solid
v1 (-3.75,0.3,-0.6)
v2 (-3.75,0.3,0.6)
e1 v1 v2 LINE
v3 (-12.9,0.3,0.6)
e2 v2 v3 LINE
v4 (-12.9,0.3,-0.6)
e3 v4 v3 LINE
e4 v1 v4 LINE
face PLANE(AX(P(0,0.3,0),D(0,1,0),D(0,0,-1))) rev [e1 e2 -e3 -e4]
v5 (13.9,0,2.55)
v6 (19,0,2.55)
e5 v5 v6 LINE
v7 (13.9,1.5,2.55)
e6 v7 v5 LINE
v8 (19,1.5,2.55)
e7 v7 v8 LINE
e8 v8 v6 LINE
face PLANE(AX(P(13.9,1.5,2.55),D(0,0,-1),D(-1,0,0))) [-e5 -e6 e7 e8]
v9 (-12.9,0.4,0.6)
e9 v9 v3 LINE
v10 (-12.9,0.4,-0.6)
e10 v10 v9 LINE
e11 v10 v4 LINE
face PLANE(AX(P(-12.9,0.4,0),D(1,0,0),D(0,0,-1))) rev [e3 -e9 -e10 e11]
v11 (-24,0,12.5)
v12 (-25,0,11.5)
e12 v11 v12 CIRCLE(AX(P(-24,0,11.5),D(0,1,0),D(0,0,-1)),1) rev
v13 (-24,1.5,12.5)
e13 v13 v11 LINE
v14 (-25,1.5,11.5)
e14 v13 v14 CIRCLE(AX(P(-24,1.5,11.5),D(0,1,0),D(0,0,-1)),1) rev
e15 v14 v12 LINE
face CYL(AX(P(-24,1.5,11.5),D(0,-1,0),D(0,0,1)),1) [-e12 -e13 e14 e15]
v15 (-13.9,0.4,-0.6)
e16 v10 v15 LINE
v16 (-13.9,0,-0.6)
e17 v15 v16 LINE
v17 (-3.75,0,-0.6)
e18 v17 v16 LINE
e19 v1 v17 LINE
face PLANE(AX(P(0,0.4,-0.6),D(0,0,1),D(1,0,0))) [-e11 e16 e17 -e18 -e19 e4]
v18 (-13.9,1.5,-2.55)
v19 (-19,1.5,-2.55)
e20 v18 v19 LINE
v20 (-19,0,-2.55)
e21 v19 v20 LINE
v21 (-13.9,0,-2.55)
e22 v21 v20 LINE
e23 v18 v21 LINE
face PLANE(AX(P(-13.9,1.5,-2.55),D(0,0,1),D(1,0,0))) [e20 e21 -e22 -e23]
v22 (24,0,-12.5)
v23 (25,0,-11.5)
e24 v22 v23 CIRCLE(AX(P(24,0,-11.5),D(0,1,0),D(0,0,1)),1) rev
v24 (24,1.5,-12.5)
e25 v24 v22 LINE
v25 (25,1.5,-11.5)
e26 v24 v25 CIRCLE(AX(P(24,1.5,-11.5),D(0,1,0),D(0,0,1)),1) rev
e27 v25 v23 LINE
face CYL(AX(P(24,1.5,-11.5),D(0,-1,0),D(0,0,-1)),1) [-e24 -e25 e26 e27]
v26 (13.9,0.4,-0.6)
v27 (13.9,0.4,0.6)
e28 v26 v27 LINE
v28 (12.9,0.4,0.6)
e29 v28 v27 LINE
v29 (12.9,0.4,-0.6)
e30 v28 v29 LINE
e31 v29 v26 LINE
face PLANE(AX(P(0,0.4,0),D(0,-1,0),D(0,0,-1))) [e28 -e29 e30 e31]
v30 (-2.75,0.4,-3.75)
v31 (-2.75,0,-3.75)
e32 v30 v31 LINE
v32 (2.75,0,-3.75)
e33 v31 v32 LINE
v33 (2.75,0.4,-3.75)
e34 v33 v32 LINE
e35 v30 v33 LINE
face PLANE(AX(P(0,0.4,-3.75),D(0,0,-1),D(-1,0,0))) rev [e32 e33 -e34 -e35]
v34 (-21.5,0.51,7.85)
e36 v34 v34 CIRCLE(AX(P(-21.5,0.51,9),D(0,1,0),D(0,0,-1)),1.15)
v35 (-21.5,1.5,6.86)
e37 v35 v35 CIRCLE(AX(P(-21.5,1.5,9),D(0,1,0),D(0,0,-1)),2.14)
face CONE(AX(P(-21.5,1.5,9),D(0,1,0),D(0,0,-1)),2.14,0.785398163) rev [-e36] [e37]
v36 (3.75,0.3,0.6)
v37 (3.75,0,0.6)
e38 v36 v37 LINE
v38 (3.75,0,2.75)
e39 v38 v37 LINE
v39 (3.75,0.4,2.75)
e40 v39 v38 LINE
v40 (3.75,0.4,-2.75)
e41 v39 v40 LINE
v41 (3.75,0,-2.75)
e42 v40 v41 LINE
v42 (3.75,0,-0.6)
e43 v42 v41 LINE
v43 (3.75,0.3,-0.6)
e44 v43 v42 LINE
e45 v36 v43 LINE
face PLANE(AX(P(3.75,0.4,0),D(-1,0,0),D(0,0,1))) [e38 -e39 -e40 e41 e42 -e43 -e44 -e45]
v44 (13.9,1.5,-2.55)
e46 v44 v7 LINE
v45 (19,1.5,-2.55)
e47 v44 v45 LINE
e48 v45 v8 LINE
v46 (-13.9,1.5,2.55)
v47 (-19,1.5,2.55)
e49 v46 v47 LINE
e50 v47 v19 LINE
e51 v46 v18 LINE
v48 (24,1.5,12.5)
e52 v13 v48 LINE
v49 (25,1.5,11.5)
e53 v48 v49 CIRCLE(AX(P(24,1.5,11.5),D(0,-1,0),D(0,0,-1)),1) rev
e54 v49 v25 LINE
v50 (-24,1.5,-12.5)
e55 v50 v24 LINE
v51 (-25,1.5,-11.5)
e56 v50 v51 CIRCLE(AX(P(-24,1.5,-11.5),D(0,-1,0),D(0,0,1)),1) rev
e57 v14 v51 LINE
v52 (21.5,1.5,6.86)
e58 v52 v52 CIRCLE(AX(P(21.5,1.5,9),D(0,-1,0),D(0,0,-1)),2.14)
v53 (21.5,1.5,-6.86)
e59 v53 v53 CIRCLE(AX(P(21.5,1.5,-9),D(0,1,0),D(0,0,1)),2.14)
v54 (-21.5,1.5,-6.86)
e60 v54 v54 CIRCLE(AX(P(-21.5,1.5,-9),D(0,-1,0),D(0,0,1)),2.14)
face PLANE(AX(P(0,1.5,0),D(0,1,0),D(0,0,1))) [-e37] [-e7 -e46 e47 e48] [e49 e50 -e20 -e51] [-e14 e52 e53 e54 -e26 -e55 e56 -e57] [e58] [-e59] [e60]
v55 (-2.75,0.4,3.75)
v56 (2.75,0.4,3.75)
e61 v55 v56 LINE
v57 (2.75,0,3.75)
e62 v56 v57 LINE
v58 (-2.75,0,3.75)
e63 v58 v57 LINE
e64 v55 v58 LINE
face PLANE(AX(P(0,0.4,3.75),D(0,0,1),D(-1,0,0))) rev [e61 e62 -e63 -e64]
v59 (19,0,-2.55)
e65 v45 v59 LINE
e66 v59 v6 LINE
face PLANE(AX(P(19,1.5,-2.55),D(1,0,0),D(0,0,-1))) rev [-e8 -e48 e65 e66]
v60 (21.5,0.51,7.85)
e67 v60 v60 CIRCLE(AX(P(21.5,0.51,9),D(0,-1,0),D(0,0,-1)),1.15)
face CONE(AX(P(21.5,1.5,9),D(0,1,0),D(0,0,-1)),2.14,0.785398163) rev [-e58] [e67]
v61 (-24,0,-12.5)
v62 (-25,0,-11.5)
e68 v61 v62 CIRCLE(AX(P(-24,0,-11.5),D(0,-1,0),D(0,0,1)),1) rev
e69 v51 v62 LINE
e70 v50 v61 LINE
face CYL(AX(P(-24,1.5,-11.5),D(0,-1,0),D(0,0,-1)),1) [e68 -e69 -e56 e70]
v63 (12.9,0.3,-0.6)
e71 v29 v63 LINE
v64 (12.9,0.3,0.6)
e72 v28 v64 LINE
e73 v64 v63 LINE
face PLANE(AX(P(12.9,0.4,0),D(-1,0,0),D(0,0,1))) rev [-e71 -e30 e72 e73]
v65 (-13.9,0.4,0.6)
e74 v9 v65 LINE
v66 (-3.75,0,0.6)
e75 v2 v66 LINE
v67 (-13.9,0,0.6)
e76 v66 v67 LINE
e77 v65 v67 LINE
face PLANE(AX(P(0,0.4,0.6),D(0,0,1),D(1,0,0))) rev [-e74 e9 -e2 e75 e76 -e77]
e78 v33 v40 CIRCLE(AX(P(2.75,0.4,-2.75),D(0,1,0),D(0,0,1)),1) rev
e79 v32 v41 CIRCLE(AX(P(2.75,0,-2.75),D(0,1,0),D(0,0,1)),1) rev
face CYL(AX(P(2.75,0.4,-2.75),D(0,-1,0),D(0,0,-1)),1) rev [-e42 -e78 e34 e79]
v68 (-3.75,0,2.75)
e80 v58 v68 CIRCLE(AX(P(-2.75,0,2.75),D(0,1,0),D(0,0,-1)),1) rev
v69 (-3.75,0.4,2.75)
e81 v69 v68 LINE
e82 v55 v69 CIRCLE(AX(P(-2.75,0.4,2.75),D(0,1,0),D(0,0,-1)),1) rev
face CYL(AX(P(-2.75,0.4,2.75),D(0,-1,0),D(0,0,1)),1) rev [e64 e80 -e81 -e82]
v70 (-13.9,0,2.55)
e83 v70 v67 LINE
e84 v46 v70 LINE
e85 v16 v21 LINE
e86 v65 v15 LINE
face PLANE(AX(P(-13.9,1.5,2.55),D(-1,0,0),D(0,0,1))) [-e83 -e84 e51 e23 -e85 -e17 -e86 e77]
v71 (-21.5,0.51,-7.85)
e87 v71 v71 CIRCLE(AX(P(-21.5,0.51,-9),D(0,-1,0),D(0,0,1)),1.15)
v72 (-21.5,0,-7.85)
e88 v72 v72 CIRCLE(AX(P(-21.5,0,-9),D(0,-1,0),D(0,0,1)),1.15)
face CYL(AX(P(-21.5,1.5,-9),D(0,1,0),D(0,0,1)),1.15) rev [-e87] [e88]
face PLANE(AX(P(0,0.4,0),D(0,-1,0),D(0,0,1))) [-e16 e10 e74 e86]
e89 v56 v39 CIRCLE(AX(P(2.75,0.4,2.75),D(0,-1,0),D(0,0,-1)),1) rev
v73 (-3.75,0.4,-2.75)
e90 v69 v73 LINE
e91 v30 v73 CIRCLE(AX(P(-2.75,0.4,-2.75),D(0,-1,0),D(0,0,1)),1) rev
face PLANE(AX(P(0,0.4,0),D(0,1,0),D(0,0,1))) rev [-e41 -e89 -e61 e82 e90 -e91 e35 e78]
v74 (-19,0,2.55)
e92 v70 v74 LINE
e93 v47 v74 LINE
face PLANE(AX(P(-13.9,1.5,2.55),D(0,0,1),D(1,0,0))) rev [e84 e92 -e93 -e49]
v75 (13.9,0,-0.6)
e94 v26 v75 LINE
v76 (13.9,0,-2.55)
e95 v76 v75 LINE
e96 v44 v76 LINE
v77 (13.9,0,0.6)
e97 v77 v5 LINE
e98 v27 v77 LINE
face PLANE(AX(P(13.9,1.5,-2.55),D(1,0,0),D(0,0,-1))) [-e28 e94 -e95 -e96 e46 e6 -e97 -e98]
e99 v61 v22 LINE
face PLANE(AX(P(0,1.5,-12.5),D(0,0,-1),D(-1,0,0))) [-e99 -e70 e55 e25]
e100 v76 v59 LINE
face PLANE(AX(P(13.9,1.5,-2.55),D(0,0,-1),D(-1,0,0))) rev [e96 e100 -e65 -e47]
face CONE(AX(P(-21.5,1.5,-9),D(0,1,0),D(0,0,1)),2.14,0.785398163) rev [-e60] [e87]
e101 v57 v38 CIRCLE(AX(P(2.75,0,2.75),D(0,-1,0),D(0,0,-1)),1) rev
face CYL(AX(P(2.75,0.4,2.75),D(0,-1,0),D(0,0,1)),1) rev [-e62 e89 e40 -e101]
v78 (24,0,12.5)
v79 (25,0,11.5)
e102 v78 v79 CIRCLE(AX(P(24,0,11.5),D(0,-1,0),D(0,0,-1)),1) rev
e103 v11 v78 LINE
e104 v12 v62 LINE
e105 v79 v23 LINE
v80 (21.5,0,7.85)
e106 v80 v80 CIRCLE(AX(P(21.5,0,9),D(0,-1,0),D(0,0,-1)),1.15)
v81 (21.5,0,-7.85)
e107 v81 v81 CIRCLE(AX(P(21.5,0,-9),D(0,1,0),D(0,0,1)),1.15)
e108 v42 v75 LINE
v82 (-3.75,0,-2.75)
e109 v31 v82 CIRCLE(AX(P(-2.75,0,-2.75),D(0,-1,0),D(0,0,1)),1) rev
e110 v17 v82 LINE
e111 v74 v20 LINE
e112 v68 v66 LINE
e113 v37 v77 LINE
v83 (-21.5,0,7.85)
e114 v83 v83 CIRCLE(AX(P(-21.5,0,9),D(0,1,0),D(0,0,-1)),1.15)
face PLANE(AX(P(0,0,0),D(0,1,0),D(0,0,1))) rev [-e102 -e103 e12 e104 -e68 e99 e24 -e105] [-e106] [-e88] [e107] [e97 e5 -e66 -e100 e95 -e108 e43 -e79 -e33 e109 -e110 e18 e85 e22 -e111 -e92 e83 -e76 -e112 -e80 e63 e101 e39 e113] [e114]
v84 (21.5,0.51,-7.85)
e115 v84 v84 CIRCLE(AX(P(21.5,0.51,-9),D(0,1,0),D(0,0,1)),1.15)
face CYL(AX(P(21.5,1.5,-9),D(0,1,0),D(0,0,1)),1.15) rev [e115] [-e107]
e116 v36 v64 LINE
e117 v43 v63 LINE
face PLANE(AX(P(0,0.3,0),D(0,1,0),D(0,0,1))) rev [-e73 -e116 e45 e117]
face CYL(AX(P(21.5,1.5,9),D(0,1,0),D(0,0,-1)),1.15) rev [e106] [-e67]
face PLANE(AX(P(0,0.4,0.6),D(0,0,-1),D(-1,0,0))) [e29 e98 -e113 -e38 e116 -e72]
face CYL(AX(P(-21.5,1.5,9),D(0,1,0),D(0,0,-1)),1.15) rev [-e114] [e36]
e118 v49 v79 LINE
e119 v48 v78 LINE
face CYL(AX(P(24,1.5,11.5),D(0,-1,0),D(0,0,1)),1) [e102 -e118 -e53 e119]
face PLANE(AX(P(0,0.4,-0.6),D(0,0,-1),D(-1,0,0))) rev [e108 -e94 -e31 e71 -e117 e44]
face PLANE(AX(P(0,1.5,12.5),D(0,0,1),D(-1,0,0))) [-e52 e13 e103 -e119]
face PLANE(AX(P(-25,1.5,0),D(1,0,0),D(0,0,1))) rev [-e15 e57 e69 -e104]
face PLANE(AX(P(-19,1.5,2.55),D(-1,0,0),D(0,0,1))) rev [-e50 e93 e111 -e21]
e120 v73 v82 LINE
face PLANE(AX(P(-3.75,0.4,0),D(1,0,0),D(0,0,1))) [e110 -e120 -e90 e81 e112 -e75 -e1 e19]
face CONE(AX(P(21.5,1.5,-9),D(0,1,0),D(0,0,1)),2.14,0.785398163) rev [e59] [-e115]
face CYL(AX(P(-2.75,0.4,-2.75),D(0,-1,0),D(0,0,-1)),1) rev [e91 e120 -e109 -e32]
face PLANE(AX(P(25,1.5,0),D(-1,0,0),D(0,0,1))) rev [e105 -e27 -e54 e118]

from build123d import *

# Parameters (mm, degrees)
BOSS_EXTRUDE1_DEPTH = 1.5
CUT_EXTRUDE14_DEPTH = 0.4
MIRROR1_OUTLINE_R   = 1.15
MIRROR1_DEPTH       = 0.5099999
MIRROR1_START       = 0.4
MIRROR1_2_DEPTH     = 1.1
MIRROR1_START_2     = 0.5099999
MIRROR1_3_DEPTH     = 0.9900001
SKETCH3_W           = 5.1
SKETCH3_H           = 5.1
CUT_EXTRUDE9_DEPTH  = 28.99107001
SKETCH3_8_W         = 1
SKETCH3_8_H         = 0.6
CUT_EXTRUDE13_DEPTH = 0.4
SKETCH3_5_W         = 13.9
SKETCH3_5_H         = 1.2
CUT_EXTRUDE10_DEPTH = 0.3
LID_OUTLINE_W       = 5.1
LID_OUTLINE_H       = 5.1
LID_DEPTH           = 2
LID_2_OUTLINE_W     = 10.15
LID_2_OUTLINE_H     = 1.2
LID_2_DEPTH         = 0.3
LID_START           = 0.3
LID_3_OUTLINE_W     = 1
LID_3_OUTLINE_H     = 1.2
LID_3_DEPTH         = 0.1


with BuildPart() as part:
    # Sketch1 → Boss-Extrude1 (new body)
    with BuildSketch(Plane(origin=(0, 0, 0), x_dir=(1, 0, 0), z_dir=(0, 1, 0))):
        with BuildLine():
            Line((0, 0), (25, 0))
            Line((25, 0), (25, 11.5))
            ThreePointArc((25, 11.5), (24.707106781, 12.207106781), (24, 12.5))
            Line((24, 12.5), (0, 12.5))
            Line((0, 12.5), (0, 0))
        make_face()
    extrude(amount=BOSS_EXTRUDE1_DEPTH)

    # Sketch1<11> → Cut-Extrude14 (cut)
    with BuildSketch(Plane(origin=(0, 0, 0), x_dir=(1, 0, 0), z_dir=(0, 1, 0))):
        with BuildLine():
            Line((0, 3.75), (0, 0))
            Line((0, 0), (3.75, 0))
            Line((3.75, 0), (3.75, 2.75))
            ThreePointArc((3.75, 2.75), (3.457106781, 3.457106781), (2.75, 3.75))
            Line((2.75, 3.75), (0, 3.75))
        make_face()
    extrude(amount=CUT_EXTRUDE14_DEPTH, mode=Mode.SUBTRACT)

    # Sketch11 → CSK for M2 Countersunk Flat Head Screw1 (revolve, cut)
    with BuildSketch(Plane(origin=(21.5, 1.5, -9), x_dir=(0, 0, 1), z_dir=(1, 0, 0))):
        Polygon((0, 0), (0, 1.5), (1.15, 1.5), (1.15, 0.99), (2.14, 0), align=None)
    revolve(axis=Axis((21.5, 7.85, -9), (0, -1, 0)), mode=Mode.SUBTRACT)

    # Mirror1: read off the stored shape, not the designer's step
    # Mirror1 outline → Mirror1 (add)
    with BuildSketch(Plane(origin=(0, 0, 0), x_dir=(1, 0, 0), z_dir=(0, 1, 0))):
        with BuildLine():
            Line((25, -11.5), (25, 0))
            Line((25, 0), (3.75, 0))
            Line((3.75, 0), (3.75, -2.75))
            ThreePointArc((3.75, -2.75), (3.457106781, -3.457106781), (2.75, -3.75))
            Line((2.75, -3.75), (-2.75, -3.75))
            ThreePointArc((-2.75, -3.75), (-3.457106781, -3.457106781), (-3.75, -2.75))
            Line((-3.75, -2.75), (-3.75, 2.75))
            ThreePointArc((-3.75, 2.75), (-3.457106781, 3.457106781), (-2.75, 3.75))
            Line((-2.75, 3.75), (0, 3.75))
            Line((0, 3.75), (0, 12.5))
            Line((0, 12.5), (-24, 12.5))
            ThreePointArc((-24, 12.5), (-24.707106781, 12.207106781), (-25, 11.5))
            Line((-25, 11.5), (-25, -11.5))
            ThreePointArc((-25, -11.5), (-24.707106781, -12.207106781), (-24, -12.5))
            Line((-24, -12.5), (24, -12.5))
            ThreePointArc((24, -12.5), (24.707106781, -12.207106781), (25, -11.5))
        make_face()
        with Locations((-21.5, -9)):
            Circle(MIRROR1_OUTLINE_R, mode=Mode.SUBTRACT)
        with Locations((21.5, -9)):
            Circle(MIRROR1_OUTLINE_R, mode=Mode.SUBTRACT)
        with Locations((-21.5, 9)):
            Circle(MIRROR1_OUTLINE_R, mode=Mode.SUBTRACT)
    extrude(amount=MIRROR1_DEPTH)

    # Mirror1 2 outline → Mirror1 2 (add)
    with BuildSketch(Plane(origin=(0, 0, 0), x_dir=(1, 0, 0), z_dir=(0, 1, 0)).offset(MIRROR1_START)):
        with BuildLine():
            Line((3.75, -2.75), (3.75, 0))
            Line((3.75, 0), (0, 0))
            Line((0, 0), (0, 3.75))
            Line((0, 3.75), (-2.75, 3.75))
            ThreePointArc((-2.75, 3.75), (-3.457106781, 3.457106781), (-3.75, 2.75))
            Line((-3.75, 2.75), (-3.75, -2.75))
            ThreePointArc((-3.75, -2.75), (-3.457106781, -3.457106781), (-2.75, -3.75))
            Line((-2.75, -3.75), (2.75, -3.75))
            ThreePointArc((2.75, -3.75), (3.457106781, -3.457106781), (3.75, -2.75))
        make_face()
    extrude(amount=MIRROR1_2_DEPTH)

    # Mirror1 3 outline → Mirror1 3 (add)
    with BuildSketch(Plane(origin=(0, 0, 0), x_dir=(1, 0, 0), z_dir=(0, 1, 0)).offset(MIRROR1_START_2)):
        with BuildLine():
            Line((25, -11.5), (25, 0))
            Line((25, 0), (3.75, 0))
            Line((3.75, 0), (3.75, -2.75))
            ThreePointArc((3.75, -2.75), (3.457106781, -3.457106781), (2.75, -3.75))
            Line((2.75, -3.75), (-2.75, -3.75))
            ThreePointArc((-2.75, -3.75), (-3.457106781, -3.457106781), (-3.75, -2.75))
            Line((-3.75, -2.75), (-3.75, 2.75))
            ThreePointArc((-3.75, 2.75), (-3.457106781, 3.457106781), (-2.75, 3.75))
            Line((-2.75, 3.75), (0, 3.75))
            Line((0, 3.75), (0, 12.5))
            Line((0, 12.5), (-24, 12.5))
            ThreePointArc((-24, 12.5), (-24.707106781, 12.207106781), (-25, 11.5))
            Line((-25, 11.5), (-25, -11.5))
            ThreePointArc((-25, -11.5), (-24.707106781, -12.207106781), (-24, -12.5))
            Line((-24, -12.5), (24, -12.5))
            ThreePointArc((24, -12.5), (24.707106781, -12.207106781), (25, -11.5))
        make_face()
    extrude(amount=MIRROR1_3_DEPTH)

    # Mirror1 4: loft between two sections, ruled curve by curve
    mirror1_4_from = [
        Edge.make_three_point_arc((-21.5, 0.51, -7.85), (-20.35, 0.51, -9), (-21.5, 0.51, -10.15)),
        Edge.make_three_point_arc((-21.5, 0.51, -10.15), (-22.65, 0.51, -9), (-21.5, 0.51, -7.85)),
    ]
    mirror1_4_to = [
        Edge.make_three_point_arc((-21.5, 1.5, -6.86), (-19.36, 1.5, -9), (-21.5, 1.5, -11.14)),
        Edge.make_three_point_arc((-21.5, 1.5, -11.14), (-23.64, 1.5, -9), (-21.5, 1.5, -6.86)),
    ]
    mirror1_4 = Solid(Shell([*[Face.make_surface_from_curves(mirror1_4_from[k], mirror1_4_to[k]) for k in range(2)], Face(Wire(mirror1_4_from)), Face(Wire(mirror1_4_to))]))
    add(mirror1_4, mode=Mode.SUBTRACT)

    # Mirror1 5: loft between two sections, ruled curve by curve
    mirror1_5_from = [
        Edge.make_three_point_arc((21.5, 0.51, 7.85), (20.35, 0.51, 9), (21.5, 0.51, 10.15)),
        Edge.make_three_point_arc((21.5, 0.51, 10.15), (22.65, 0.51, 9), (21.5, 0.51, 7.85)),
    ]
    mirror1_5_to = [
        Edge.make_three_point_arc((21.5, 1.5, 6.86), (19.36, 1.5, 9), (21.5, 1.5, 11.14)),
        Edge.make_three_point_arc((21.5, 1.5, 11.14), (23.64, 1.5, 9), (21.5, 1.5, 6.86)),
    ]
    mirror1_5 = Solid(Shell([*[Face.make_surface_from_curves(mirror1_5_from[k], mirror1_5_to[k]) for k in range(2)], Face(Wire(mirror1_5_from)), Face(Wire(mirror1_5_to))]))
    add(mirror1_5, mode=Mode.SUBTRACT)

    # Mirror1 6: loft between two sections, ruled curve by curve
    mirror1_6_from = [
        Edge.make_three_point_arc((-21.5, 0.51, 7.85), (-22.65, 0.51, 9), (-21.5, 0.51, 10.15)),
        Edge.make_three_point_arc((-21.5, 0.51, 10.15), (-20.35, 0.51, 9), (-21.5, 0.51, 7.85)),
    ]
    mirror1_6_to = [
        Edge.make_three_point_arc((-21.5, 1.5, 6.86), (-23.64, 1.5, 9), (-21.5, 1.5, 11.14)),
        Edge.make_three_point_arc((-21.5, 1.5, 11.14), (-19.36, 1.5, 9), (-21.5, 1.5, 6.86)),
    ]
    mirror1_6 = Solid(Shell([*[Face.make_surface_from_curves(mirror1_6_from[k], mirror1_6_to[k]) for k in range(2)], Face(Wire(mirror1_6_from)), Face(Wire(mirror1_6_to))]))
    add(mirror1_6, mode=Mode.SUBTRACT)

    # Sketch3 → Cut-Extrude9 (cut, through all)
    with BuildSketch(Plane.XZ):
        with Locations((16.45, 0)):
            Rectangle(SKETCH3_W, SKETCH3_H)
    extrude(amount=-CUT_EXTRUDE9_DEPTH, mode=Mode.SUBTRACT)

    # Sketch3<8> → Cut-Extrude13 (cut)
    with BuildSketch(Plane.XZ):
        with Locations((13.4, -0.3)):
            Rectangle(SKETCH3_8_W, SKETCH3_8_H)
        with Locations((13.4, 0.3)):
            Rectangle(SKETCH3_8_W, SKETCH3_8_H)
    extrude(amount=-CUT_EXTRUDE13_DEPTH, mode=Mode.SUBTRACT)

    # Sketch3<5> → Cut-Extrude10 (cut)
    with BuildSketch(Plane.XZ):
        with Locations((6.95, 0)):
            Rectangle(SKETCH3_5_W, SKETCH3_5_H)
    extrude(amount=-CUT_EXTRUDE10_DEPTH, mode=Mode.SUBTRACT)

    # lid: read off the stored shape, not the designer's step
    # lid outline → lid (cut)
    with BuildSketch(Plane(origin=(0, 0, 0), x_dir=(1, 0, 0), z_dir=(0, 1, 0))):
        with Locations((-16.45, 0)):
            Rectangle(LID_OUTLINE_W, LID_OUTLINE_H)
    extrude(amount=LID_DEPTH, mode=Mode.SUBTRACT)

    # lid 2 outline → lid 2 (cut)
    with BuildSketch(Plane(origin=(0, 0, 0), x_dir=(1, 0, 0), z_dir=(0, 1, 0))):
        with Locations((-8.825, 0)):
            Rectangle(LID_2_OUTLINE_W, LID_2_OUTLINE_H)
    extrude(amount=LID_2_DEPTH, mode=Mode.SUBTRACT)

    # lid 3 outline → lid 3 (cut)
    with BuildSketch(Plane(origin=(0, 0, 0), x_dir=(1, 0, 0), z_dir=(0, 1, 0)).offset(LID_START)):
        with Locations((-13.4, 0)):
            Rectangle(LID_3_OUTLINE_W, LID_3_OUTLINE_H)
    extrude(amount=LID_3_DEPTH, mode=Mode.SUBTRACT)


solid = part.part
